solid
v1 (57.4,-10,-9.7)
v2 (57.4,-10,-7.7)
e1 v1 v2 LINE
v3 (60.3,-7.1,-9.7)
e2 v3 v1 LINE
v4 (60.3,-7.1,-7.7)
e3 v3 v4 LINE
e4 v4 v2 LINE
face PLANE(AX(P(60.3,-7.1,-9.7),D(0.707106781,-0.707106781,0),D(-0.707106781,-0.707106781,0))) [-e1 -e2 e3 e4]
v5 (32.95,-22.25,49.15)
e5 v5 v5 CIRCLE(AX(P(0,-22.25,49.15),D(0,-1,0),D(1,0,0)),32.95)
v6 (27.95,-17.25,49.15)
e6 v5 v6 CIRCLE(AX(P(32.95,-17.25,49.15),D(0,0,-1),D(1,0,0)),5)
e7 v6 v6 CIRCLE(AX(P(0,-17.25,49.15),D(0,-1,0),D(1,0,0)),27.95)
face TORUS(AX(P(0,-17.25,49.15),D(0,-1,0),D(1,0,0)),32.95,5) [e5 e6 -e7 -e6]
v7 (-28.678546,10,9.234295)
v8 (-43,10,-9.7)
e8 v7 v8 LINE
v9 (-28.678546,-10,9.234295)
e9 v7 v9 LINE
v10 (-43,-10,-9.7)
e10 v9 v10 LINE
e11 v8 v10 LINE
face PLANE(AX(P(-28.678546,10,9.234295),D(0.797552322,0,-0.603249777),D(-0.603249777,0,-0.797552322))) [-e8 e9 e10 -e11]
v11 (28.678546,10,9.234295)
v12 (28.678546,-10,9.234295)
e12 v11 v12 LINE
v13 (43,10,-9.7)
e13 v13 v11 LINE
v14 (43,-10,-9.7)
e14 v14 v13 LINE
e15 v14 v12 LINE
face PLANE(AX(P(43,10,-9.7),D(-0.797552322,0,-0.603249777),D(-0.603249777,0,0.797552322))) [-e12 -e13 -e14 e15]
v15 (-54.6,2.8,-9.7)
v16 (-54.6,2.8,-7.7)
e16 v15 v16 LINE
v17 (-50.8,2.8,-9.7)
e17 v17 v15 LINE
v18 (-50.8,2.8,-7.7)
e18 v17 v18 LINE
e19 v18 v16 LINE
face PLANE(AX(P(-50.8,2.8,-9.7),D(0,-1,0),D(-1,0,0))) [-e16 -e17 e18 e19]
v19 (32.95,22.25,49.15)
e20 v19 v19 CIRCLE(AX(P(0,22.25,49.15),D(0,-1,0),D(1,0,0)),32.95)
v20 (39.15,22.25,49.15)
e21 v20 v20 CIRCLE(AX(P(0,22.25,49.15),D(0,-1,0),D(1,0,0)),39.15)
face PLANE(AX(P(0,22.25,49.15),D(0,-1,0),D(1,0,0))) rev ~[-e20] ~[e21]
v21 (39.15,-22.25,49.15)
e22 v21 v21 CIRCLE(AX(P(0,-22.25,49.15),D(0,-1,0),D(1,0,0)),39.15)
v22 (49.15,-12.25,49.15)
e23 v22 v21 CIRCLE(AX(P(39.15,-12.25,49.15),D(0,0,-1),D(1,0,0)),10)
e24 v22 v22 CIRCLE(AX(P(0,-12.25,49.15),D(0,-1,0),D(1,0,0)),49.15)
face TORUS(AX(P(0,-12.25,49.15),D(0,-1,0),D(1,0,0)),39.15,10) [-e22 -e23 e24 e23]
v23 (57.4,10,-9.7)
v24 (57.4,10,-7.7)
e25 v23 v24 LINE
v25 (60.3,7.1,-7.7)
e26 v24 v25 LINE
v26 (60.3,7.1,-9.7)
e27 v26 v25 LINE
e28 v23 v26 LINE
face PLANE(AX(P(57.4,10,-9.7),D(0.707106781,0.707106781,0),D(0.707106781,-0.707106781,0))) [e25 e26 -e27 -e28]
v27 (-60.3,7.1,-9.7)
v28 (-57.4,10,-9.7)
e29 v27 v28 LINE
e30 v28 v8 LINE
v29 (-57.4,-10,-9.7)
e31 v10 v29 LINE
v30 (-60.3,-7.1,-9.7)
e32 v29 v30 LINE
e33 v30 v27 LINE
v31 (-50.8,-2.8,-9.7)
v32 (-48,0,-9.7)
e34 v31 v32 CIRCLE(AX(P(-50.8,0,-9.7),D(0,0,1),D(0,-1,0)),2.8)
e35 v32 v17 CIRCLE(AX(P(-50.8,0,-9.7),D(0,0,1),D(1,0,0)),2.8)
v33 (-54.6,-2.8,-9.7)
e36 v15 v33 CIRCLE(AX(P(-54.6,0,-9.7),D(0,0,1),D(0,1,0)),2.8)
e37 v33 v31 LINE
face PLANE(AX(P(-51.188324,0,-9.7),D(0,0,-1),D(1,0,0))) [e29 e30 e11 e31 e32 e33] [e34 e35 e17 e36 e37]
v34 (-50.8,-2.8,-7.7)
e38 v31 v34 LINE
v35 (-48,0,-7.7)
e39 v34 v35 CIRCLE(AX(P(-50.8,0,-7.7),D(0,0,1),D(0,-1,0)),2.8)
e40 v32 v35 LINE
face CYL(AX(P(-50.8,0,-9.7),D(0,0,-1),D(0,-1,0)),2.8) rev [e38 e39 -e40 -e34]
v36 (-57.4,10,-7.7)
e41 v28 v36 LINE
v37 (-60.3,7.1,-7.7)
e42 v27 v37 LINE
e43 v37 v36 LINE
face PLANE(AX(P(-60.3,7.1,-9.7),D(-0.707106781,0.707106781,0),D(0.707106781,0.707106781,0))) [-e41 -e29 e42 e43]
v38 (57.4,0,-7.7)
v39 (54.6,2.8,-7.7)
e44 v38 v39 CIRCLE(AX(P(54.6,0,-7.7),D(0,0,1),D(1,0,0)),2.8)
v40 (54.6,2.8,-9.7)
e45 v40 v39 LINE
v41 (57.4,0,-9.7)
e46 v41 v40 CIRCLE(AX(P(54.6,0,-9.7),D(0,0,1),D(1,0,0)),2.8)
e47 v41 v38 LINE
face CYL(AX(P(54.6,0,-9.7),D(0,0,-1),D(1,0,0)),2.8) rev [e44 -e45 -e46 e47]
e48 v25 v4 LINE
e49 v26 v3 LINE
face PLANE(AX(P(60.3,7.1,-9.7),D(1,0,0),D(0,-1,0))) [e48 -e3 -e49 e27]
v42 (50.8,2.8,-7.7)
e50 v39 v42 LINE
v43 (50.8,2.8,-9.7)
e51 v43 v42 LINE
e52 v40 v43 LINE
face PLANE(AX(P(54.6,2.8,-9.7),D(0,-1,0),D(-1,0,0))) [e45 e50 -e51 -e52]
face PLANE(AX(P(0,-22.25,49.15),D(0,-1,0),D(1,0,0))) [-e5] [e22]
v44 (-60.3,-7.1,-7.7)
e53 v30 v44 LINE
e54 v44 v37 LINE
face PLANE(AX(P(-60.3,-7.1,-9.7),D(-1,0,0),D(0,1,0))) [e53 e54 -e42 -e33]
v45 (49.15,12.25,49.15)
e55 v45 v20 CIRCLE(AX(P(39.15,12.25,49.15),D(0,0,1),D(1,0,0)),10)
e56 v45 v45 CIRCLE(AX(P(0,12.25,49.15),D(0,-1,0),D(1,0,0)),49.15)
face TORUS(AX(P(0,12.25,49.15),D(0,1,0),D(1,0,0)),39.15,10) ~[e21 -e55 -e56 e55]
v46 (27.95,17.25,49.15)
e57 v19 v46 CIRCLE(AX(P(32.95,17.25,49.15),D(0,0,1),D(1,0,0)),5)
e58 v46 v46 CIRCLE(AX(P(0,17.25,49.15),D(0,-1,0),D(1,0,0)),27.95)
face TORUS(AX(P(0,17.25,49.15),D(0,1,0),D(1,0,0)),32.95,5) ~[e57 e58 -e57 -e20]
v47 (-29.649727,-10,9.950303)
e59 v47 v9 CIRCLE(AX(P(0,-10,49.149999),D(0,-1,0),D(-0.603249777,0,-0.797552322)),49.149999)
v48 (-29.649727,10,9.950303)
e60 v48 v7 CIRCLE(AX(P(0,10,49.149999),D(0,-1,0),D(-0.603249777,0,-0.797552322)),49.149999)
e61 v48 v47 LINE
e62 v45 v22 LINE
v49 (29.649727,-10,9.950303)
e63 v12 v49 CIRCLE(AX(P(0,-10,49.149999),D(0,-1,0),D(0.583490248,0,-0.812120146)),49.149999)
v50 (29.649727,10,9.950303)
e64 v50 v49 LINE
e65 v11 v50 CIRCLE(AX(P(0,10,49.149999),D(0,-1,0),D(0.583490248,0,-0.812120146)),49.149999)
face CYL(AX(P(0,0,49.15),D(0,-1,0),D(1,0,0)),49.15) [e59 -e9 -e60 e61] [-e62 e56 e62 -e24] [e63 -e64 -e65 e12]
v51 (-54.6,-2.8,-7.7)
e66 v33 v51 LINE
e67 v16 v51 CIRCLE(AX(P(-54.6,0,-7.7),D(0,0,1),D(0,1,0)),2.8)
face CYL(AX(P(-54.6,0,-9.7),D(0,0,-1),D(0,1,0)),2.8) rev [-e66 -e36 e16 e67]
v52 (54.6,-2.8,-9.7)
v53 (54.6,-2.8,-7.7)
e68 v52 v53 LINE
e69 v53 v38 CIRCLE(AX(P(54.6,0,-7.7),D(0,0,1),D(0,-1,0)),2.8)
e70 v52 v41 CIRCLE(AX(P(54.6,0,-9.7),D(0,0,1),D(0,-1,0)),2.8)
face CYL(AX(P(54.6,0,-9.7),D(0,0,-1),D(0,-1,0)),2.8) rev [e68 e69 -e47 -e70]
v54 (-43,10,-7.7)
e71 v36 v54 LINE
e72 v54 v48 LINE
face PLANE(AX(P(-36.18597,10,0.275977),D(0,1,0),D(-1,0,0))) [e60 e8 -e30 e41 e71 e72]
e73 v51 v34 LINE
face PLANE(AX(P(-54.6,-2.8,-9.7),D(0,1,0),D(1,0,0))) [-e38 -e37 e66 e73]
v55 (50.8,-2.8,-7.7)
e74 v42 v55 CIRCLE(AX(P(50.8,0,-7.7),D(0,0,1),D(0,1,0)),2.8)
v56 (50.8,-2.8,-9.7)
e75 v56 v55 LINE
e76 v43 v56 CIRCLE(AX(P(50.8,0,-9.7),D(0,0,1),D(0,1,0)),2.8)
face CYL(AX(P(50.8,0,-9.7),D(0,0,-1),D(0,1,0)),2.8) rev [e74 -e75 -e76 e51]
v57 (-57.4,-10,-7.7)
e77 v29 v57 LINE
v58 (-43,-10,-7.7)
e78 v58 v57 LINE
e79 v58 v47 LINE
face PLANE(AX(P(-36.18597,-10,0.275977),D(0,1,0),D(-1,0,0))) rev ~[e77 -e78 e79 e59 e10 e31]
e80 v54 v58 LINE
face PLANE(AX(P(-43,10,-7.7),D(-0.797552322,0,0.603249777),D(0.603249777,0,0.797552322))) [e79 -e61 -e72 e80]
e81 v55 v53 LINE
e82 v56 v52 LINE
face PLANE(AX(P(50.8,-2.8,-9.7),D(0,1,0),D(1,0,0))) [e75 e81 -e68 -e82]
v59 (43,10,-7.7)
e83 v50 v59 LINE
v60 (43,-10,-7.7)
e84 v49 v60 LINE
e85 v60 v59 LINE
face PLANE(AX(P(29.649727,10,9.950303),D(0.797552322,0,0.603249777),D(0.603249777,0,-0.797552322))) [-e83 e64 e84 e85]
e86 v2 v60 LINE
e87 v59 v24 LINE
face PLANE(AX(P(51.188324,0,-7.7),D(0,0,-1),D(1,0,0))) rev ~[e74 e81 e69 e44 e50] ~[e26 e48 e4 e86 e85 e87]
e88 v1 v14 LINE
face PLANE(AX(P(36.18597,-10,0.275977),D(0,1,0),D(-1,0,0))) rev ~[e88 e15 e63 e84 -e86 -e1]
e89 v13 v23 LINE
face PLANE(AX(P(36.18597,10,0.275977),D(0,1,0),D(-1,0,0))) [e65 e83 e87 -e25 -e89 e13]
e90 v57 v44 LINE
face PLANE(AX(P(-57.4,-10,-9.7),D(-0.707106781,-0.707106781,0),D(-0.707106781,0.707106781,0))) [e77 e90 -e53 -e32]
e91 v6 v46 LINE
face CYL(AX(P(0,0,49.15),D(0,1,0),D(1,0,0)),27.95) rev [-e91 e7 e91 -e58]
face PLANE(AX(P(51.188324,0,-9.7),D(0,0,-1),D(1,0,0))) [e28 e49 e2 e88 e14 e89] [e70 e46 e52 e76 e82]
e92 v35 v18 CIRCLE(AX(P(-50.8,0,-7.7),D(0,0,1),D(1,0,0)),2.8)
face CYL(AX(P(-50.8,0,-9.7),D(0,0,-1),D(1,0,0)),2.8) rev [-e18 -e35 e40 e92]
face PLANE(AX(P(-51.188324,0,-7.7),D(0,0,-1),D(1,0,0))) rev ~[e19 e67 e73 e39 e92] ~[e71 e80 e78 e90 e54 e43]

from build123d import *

# Parameters (mm, degrees)
F0_R     = 49.15
F0_R_2   = 27.95
F1_DEPTH = 22.25
F2_R     = 10
F3_R     = 5
F7_DEPTH = 2
F9_DEPTH = 20


with BuildPart() as f1:
    # F0 (on Front) → F1 (new body, symmetric)
    with BuildSketch(Plane.XZ):
        with Locations((0, 49.15)):
            Circle(F0_R)
        with Locations((0, 49.15)):
            Circle(F0_R_2, mode=Mode.SUBTRACT)
    extrude(amount=F1_DEPTH, both=True)

    # F2
    f2_edges = [f1.edges().sort_by_distance(p)[0] for p in [
        (-49.15, -22.25, 49.15),
        (-49.15, 22.25, 49.15),
    ]]
    fillet(f2_edges, radius=F2_R)

    # F3
    f3_edges = [f1.edges().sort_by_distance(p)[0] for p in [
        (-27.95, 22.25, 49.15),
        (-27.95, -22.25, 49.15),
    ]]
    fillet(f3_edges, radius=F3_R)



with BuildPart() as f7:
    # F5 (on face) → F7 (new body)
    with BuildSketch(Plane(origin=(0, 0, -9.7), x_dir=(1, 0, 0), z_dir=(0, 0, -1))):
        Polygon((43, 10), (43, -10), (57.4, -10), (60.3, -7.1), (60.3, 7.1), (57.4, 10), align=None)
        with BuildLine():
            ThreePointArc((54.6, 2.8), (56.5798989873, 1.9798989873), (57.4, 0))
            ThreePointArc((57.4, 0), (56.5798989873, -1.9798989873), (54.6, -2.8))
            Line((54.6, -2.8), (50.8, -2.8))
            ThreePointArc((50.8, -2.8), (48, 0), (50.8, 2.8))
            Line((50.8, 2.8), (54.6, 2.8))
        make_face(mode=Mode.SUBTRACT)
    extrude(amount=-F7_DEPTH)


with BuildPart() as f7b:
    # F5 (on face) → F7, piece 2 (new body)
    with BuildSketch(Plane(origin=(0, 0, -9.7), x_dir=(1, 0, 0), z_dir=(0, 0, -1))):
        Polygon((-57.4, -10), (-43, -10), (-43, 10), (-57.4, 10), (-60.3, 7.1), (-60.3, -7.1), align=None)
        with BuildLine():
            ThreePointArc((-54.6, -2.8), (-57.4, 0), (-54.6, 2.8))
            Line((-54.6, 2.8), (-50.8, 2.8))
            ThreePointArc((-50.8, 2.8), (-48.8201010127, 1.9798989873), (-48, 0))
            ThreePointArc((-48, 0), (-48.8201010127, -1.9798989873), (-50.8, -2.8))
            Line((-50.8, -2.8), (-54.6, -2.8))
        make_face(mode=Mode.SUBTRACT)
    extrude(amount=-F7_DEPTH)


with BuildPart() as f1_1:
    add(f1.part)

    add(f7.part)  # F9 merges F7

    add(f7b.part)  # F9 merges F7b
    # F8 (on face) → F9 (join, through all)
    with BuildSketch(Plane(origin=(0, 10, 0), x_dir=(-1, 0, 0), z_dir=(0, 1, 0))):
        with BuildLine():
            Line((43, -7.7), (29.6497265558, 9.9503033791))
            ThreePointArc((29.6497265558, 9.9503033791), (29.1663333729, 9.5893187927), (28.6785456751, 9.2342948458))
            Line((28.6785456751, 9.2342948458), (43, -9.7))
            Line((43, -9.7), (43, -7.7))
        make_face()
        with BuildLine():
            ThreePointArc((-28.6785456751, 9.2342948458), (-29.1663333729, 9.5893187927), (-29.6497265558, 9.9503033791))
            Line((-29.6497265558, 9.9503033791), (-43, -7.7))
            Line((-43, -7.7), (-43, -9.7))
            Line((-43, -9.7), (-28.6785456751, 9.2342948458))
        make_face()
    extrude(amount=-F9_DEPTH)


solid = f1_1.part
